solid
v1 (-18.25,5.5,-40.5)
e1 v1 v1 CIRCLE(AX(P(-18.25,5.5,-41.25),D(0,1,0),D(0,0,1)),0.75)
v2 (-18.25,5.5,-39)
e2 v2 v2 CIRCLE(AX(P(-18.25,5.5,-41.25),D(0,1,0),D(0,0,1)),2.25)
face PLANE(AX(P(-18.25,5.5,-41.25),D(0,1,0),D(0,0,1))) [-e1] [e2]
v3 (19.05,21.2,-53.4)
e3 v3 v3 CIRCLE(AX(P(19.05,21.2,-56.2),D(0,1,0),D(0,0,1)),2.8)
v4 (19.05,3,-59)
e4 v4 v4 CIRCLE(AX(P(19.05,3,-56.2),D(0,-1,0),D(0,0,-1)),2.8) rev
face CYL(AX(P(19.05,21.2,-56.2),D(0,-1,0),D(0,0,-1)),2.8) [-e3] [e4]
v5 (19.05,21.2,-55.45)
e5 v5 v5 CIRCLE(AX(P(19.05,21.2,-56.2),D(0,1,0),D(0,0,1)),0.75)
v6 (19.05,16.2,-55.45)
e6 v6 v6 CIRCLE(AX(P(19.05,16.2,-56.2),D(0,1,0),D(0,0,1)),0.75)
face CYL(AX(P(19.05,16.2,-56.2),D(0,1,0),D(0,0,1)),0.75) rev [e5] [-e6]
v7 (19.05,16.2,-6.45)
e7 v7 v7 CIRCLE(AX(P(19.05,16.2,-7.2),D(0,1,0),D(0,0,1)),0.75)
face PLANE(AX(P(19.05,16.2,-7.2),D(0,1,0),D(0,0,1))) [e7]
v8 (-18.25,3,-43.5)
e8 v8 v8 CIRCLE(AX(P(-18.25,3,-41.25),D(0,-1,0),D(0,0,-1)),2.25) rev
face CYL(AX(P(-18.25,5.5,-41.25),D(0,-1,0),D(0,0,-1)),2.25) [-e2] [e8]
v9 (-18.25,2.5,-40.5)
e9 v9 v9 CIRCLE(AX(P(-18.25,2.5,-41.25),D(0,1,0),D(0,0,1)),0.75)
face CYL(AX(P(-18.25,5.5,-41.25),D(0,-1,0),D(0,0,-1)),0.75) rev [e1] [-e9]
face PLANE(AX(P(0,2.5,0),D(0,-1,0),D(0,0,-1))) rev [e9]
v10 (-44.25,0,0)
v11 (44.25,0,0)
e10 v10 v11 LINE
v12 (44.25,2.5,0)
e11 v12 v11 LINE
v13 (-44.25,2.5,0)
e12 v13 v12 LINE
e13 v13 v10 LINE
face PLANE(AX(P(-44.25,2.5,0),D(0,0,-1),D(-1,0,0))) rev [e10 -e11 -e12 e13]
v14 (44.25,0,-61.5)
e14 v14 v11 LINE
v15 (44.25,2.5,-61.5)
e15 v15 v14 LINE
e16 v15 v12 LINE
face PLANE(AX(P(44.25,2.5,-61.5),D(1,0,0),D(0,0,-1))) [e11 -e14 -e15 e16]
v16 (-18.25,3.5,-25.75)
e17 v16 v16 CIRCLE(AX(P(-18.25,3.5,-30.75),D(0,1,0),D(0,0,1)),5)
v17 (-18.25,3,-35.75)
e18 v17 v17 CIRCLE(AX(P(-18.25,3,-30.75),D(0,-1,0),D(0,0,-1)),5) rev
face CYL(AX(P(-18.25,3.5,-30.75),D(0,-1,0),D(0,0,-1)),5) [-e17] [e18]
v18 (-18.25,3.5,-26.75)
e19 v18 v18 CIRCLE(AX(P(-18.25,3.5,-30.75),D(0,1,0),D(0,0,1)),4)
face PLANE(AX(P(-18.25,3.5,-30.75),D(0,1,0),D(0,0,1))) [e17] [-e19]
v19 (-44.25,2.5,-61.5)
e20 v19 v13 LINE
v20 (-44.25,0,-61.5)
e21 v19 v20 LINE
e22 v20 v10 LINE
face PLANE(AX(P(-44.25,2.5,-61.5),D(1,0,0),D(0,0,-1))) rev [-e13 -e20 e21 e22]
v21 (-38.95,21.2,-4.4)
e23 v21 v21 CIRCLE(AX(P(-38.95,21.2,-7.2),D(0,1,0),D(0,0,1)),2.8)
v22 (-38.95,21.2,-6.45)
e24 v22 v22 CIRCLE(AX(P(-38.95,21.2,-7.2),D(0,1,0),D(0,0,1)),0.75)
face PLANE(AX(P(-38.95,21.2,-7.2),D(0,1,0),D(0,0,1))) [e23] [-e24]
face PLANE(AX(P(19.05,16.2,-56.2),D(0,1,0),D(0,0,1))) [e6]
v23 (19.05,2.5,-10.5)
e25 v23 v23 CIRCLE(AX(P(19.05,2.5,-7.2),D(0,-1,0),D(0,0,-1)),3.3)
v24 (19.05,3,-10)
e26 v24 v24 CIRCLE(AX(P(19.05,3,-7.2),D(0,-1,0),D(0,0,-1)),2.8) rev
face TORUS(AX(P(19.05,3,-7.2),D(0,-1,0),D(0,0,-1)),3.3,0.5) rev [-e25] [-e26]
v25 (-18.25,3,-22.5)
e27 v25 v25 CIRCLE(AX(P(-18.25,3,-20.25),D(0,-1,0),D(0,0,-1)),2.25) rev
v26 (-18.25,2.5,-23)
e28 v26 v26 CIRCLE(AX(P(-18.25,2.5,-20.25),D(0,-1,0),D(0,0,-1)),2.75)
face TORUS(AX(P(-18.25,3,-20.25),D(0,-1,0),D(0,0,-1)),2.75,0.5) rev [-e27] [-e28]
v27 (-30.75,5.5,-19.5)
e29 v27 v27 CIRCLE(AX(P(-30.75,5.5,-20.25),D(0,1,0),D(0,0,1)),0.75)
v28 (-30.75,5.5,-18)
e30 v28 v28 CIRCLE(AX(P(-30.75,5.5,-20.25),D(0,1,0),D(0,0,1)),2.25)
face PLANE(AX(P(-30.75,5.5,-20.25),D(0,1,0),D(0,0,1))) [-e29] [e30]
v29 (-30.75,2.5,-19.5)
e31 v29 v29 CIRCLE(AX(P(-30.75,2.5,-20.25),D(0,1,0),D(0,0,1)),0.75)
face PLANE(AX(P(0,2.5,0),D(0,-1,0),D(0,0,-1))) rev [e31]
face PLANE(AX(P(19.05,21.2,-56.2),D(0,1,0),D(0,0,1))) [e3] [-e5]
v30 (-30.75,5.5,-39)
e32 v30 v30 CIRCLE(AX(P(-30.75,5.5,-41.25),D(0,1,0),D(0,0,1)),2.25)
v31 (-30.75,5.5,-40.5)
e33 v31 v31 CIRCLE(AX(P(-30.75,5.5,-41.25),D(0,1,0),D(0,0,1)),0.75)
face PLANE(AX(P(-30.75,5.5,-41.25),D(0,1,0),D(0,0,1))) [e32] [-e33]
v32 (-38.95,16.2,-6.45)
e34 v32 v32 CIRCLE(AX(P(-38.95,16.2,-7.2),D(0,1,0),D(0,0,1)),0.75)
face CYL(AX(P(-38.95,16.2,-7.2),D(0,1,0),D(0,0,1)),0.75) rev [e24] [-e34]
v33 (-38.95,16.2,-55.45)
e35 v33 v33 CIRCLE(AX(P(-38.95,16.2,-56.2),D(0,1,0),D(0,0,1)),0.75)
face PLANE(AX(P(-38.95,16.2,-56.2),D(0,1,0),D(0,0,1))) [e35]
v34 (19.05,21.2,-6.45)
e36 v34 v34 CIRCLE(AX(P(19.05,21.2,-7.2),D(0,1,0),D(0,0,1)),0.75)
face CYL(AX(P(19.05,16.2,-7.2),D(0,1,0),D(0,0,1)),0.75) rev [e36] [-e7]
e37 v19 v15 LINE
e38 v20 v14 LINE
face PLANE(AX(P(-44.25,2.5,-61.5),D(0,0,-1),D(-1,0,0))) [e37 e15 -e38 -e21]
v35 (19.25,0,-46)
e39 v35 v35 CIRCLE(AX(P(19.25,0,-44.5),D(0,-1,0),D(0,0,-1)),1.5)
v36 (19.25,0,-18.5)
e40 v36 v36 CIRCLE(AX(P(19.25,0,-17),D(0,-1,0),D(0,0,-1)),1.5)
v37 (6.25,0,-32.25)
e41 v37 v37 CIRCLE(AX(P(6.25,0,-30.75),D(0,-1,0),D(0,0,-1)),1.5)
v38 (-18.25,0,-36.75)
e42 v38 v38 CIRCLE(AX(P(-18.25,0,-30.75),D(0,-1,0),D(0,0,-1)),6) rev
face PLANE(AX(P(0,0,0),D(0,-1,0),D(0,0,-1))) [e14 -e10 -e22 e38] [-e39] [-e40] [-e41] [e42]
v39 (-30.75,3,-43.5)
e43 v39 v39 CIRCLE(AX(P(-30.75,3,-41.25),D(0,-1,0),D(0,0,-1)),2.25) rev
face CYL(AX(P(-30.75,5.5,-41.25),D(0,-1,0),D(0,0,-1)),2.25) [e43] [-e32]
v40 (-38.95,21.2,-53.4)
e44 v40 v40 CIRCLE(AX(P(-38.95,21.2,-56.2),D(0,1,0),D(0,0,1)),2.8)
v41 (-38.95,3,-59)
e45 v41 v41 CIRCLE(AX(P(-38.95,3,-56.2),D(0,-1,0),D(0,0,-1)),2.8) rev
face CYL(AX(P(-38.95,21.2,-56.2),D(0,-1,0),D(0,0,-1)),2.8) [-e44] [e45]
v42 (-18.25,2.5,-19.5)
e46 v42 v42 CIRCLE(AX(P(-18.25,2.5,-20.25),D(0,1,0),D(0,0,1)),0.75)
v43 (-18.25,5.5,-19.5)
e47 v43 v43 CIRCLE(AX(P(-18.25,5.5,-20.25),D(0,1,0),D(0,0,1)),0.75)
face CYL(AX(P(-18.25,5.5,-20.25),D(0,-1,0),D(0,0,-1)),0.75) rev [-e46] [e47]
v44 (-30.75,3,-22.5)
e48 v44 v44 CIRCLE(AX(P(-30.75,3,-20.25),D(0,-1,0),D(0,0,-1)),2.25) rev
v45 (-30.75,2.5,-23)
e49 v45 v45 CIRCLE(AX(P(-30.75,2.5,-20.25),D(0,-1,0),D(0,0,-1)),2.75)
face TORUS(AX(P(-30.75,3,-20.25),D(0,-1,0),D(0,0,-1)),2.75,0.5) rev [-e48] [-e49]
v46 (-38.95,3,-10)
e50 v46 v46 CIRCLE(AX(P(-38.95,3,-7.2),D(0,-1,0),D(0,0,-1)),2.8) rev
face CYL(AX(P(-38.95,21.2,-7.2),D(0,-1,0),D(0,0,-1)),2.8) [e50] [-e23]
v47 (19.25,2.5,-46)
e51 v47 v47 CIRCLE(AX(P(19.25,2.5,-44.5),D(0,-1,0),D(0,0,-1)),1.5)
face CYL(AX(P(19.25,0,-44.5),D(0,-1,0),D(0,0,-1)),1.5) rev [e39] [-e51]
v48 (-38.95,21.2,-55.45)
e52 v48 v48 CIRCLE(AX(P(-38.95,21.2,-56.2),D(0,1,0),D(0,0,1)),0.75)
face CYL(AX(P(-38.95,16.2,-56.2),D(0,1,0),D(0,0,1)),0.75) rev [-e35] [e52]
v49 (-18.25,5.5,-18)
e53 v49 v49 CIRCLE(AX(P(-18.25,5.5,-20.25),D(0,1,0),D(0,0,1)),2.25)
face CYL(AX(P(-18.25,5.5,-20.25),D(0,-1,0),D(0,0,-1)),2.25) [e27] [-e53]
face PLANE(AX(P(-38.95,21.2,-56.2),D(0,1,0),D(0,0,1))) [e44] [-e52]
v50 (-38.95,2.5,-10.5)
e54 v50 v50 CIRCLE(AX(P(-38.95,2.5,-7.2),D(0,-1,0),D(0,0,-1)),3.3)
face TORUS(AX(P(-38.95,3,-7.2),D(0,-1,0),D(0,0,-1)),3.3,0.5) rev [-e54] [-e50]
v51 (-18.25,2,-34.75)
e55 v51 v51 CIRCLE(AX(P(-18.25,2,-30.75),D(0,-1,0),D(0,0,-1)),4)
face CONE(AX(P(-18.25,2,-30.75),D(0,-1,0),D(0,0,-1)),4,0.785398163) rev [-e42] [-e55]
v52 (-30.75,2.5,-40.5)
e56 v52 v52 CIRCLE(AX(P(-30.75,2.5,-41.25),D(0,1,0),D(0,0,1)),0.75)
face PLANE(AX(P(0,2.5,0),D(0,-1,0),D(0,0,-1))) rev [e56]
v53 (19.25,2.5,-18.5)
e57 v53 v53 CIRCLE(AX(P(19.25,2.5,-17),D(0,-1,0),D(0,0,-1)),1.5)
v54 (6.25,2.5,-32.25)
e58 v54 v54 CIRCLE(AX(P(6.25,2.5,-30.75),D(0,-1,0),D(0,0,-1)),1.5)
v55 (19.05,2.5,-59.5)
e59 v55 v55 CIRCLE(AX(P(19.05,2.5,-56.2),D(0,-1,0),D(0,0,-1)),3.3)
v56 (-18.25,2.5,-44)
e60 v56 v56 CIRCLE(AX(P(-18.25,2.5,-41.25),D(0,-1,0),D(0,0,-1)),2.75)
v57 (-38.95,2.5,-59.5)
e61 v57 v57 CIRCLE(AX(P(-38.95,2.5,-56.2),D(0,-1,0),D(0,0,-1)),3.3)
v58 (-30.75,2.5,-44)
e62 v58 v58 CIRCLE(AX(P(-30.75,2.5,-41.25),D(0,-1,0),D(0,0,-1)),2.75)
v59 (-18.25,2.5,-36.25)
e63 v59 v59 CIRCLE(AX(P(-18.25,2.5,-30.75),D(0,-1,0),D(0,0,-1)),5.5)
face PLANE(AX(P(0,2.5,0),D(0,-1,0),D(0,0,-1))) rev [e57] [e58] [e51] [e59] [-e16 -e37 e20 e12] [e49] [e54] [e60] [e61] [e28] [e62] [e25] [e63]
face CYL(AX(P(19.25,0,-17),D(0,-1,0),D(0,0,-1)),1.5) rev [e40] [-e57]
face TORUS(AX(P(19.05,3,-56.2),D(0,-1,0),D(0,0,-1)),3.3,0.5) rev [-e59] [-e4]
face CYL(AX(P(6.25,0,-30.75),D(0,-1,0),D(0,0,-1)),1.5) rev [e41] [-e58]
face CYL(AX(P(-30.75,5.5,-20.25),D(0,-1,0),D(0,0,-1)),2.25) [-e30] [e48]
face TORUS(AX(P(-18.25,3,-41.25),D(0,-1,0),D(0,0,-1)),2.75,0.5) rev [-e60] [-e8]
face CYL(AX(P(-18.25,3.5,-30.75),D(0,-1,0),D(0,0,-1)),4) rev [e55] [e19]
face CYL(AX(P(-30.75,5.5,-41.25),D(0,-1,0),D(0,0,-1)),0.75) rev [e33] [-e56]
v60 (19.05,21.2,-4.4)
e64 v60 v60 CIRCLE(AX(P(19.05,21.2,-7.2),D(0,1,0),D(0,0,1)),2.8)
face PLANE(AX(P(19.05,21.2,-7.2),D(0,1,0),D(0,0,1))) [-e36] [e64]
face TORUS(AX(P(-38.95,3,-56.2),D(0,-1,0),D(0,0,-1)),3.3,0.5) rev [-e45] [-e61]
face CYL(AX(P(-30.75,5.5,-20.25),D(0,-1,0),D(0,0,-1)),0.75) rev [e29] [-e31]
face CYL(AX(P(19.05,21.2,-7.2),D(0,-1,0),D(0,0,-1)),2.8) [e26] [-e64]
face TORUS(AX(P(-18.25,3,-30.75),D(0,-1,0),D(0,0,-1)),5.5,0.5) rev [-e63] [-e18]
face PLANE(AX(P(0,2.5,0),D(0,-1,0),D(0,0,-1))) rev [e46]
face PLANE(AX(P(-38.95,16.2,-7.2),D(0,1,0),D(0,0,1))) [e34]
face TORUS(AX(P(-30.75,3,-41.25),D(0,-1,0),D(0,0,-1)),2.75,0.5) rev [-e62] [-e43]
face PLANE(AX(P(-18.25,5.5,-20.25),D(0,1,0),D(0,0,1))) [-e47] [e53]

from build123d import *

# Parameters (mm, degrees)
SKETCH1_W             = 88.5
SKETCH1_H             = 61.5
BOSS_EXTRUDE1_DEPTH   = 2.5
SKETCH1_3_R           = 2.8
BOSS_EXTRUDE2_DEPTH   = 21.2
SKETCH3_R             = 5
SKETCH3_R_2           = 4
BOSS_EXTRUDE3_DEPTH   = 1
SKETCH3_4_R           = 2.25
SKETCH3_4_R_2         = 0.75
BOSS_EXTRUDE4_DEPTH   = 3
CUT_EXTRUDE3_START    = -10
SKETCH3_5_R           = 4
CUT_EXTRUDE3_DEPTH    = 10
CHAMFER1_SIZE         = 2
SKETCH4_R             = 0.75
CUT_EXTRUDE4_DEPTH    = 5
FILLET1_R             = 0.5
F_3_0MM_DOWEL_HOLE1_D = 3


with BuildPart() as part:
    # Sketch1 → Boss-Extrude1 (new body)
    with BuildSketch(Plane(origin=(0, 0, 0), x_dir=(1, 0, 0), z_dir=(0, 1, 0))):
        with Locations((0, 30.75)):
            Rectangle(SKETCH1_W, SKETCH1_H)
    extrude(amount=BOSS_EXTRUDE1_DEPTH)

    # Sketch1<3> → Boss-Extrude2 (add)
    with BuildSketch(Plane(origin=(0, 0, 0), x_dir=(1, 0, 0), z_dir=(0, 1, 0))):
        with Locations(Location((-38.95, 56.2, 0), (0, 0, 90))):
            Circle(SKETCH1_3_R)
        with Locations(Location((-38.95, 7.2, 0), (0, 0, 90))):
            Circle(SKETCH1_3_R)
        with Locations(Location((19.05, 7.2, 0), (0, 0, 90))):
            Circle(SKETCH1_3_R)
        with Locations(Location((19.05, 56.2, 0), (0, 0, 90))):
            Circle(SKETCH1_3_R)
    extrude(amount=BOSS_EXTRUDE2_DEPTH)

    # Sketch3 → Boss-Extrude3 (add)
    with BuildSketch(Plane(origin=(0, 2.5, 0), x_dir=(1, 0, 0), z_dir=(0, 1, 0))):
        with Locations(Location((-18.25, 30.75, 0), (0, 0, 90))):
            Circle(SKETCH3_R)
        with Locations(Location((-18.25, 30.75, 0), (0, 0, 270))):
            Circle(SKETCH3_R_2, mode=Mode.SUBTRACT)
    extrude(amount=BOSS_EXTRUDE3_DEPTH)

    # Sketch3<4> → Boss-Extrude4 (add)
    # profile 1 of 4: a face of its own
    with BuildSketch(Plane(origin=(0, 2.5, 0), x_dir=(1, 0, 0), z_dir=(0, 1, 0))):
        with Locations(Location((-18.25, 41.25, 0), (0, 0, 90))):
            Circle(SKETCH3_4_R)
        with Locations(Location((-18.25, 41.25, 0), (0, 0, 270))):
            Circle(SKETCH3_4_R_2, mode=Mode.SUBTRACT)
    # profile 2 of 4: a face of its own
    with BuildSketch(Plane(origin=(0, 2.5, 0), x_dir=(1, 0, 0), z_dir=(0, 1, 0))):
        with Locations(Location((-18.25, 20.25, 0), (0, 0, 90))):
            Circle(SKETCH3_4_R)
        with Locations(Location((-18.25, 20.25, 0), (0, 0, 270))):
            Circle(SKETCH3_4_R_2, mode=Mode.SUBTRACT)
    # profile 3 of 4: a face of its own
    with BuildSketch(Plane(origin=(0, 2.5, 0), x_dir=(1, 0, 0), z_dir=(0, 1, 0))):
        with Locations(Location((-30.75, 41.25, 0), (0, 0, 90))):
            Circle(SKETCH3_4_R)
        with Locations(Location((-30.75, 41.25, 0), (0, 0, 270))):
            Circle(SKETCH3_4_R_2, mode=Mode.SUBTRACT)
    # profile 4 of 4: a face of its own
    with BuildSketch(Plane(origin=(0, 2.5, 0), x_dir=(1, 0, 0), z_dir=(0, 1, 0))):
        with Locations(Location((-30.75, 20.25, 0), (0, 0, 90))):
            Circle(SKETCH3_4_R)
        with Locations(Location((-30.75, 20.25, 0), (0, 0, 270))):
            Circle(SKETCH3_4_R_2, mode=Mode.SUBTRACT)
    extrude(amount=BOSS_EXTRUDE4_DEPTH)

    # Sketch3<5> → Cut-Extrude3 (cut)
    with BuildSketch(Plane(origin=(0, 2.5, 0), x_dir=(1, 0, 0), z_dir=(0, 1, 0)).offset(CUT_EXTRUDE3_START)):
        with Locations(Location((-18.25, 30.75, 0), (0, 0, 90))):
            Circle(SKETCH3_5_R)
    extrude(amount=CUT_EXTRUDE3_DEPTH, mode=Mode.SUBTRACT)

    # Chamfer1
    # the kernel refuses this chamfer: 2 mm, written as the material it takes off along each edge
    with BuildSketch(Plane(origin=(-18.25, 0, -30.75), x_dir=(0, 0, -1), z_dir=(-1, 0, 0))) as chamfer1_piece_1:
        Polygon((4 + CHAMFER1_SIZE, 0), (4, -CHAMFER1_SIZE), (4, 0), align=None)
    revolve(axis=Axis((-18.25, 0, -30.75), (0, -1, 0)), mode=Mode.SUBTRACT)

    # Sketch4 → Cut-Extrude4 (cut)
    with BuildSketch(Plane(origin=(0, 21.2, 0), x_dir=(1, 0, 0), z_dir=(0, 1, 0))):
        with Locations(Location((-38.95, 56.2, 0), (0, 0, 270))):
            Circle(SKETCH4_R)
        with Locations(Location((19.05, 56.2, 0), (0, 0, 270))):
            Circle(SKETCH4_R)
        with Locations(Location((-38.95, 7.2, 0), (0, 0, 270))):
            Circle(SKETCH4_R)
        with Locations(Location((19.05, 7.2, 0), (0, 0, 270))):
            Circle(SKETCH4_R)
    extrude(amount=-CUT_EXTRUDE4_DEPTH, mode=Mode.SUBTRACT)

    # Fillet1
    fillet1_edges = [part.edges().sort_by_distance(p)[0] for p in [
        (-38.95, 2.5, -4.4),
        (-38.95, 2.5, -53.4),
        (19.05, 2.5, -53.4),
        (19.05, 2.5, -4.4),
        (-18.25, 2.5, -25.75),
        (-18.25, 2.5, -18),
        (-30.75, 2.5, -39),
        (-18.25, 2.5, -39),
        (-30.75, 2.5, -18),
    ]]
    fillet(fillet1_edges, radius=FILLET1_R)

    # Ø3.0mm Dowel Hole1 (through all)
    with Locations(Plane(origin=(0, 0, 0), x_dir=(-1, 0, 0), z_dir=(0, -1, 0))):
        with Locations((-19.25, 44.5), (-19.25, 17), (-6.25, 30.75)):
            Hole(F_3_0MM_DOWEL_HOLE1_D / 2)


solid = part.part
